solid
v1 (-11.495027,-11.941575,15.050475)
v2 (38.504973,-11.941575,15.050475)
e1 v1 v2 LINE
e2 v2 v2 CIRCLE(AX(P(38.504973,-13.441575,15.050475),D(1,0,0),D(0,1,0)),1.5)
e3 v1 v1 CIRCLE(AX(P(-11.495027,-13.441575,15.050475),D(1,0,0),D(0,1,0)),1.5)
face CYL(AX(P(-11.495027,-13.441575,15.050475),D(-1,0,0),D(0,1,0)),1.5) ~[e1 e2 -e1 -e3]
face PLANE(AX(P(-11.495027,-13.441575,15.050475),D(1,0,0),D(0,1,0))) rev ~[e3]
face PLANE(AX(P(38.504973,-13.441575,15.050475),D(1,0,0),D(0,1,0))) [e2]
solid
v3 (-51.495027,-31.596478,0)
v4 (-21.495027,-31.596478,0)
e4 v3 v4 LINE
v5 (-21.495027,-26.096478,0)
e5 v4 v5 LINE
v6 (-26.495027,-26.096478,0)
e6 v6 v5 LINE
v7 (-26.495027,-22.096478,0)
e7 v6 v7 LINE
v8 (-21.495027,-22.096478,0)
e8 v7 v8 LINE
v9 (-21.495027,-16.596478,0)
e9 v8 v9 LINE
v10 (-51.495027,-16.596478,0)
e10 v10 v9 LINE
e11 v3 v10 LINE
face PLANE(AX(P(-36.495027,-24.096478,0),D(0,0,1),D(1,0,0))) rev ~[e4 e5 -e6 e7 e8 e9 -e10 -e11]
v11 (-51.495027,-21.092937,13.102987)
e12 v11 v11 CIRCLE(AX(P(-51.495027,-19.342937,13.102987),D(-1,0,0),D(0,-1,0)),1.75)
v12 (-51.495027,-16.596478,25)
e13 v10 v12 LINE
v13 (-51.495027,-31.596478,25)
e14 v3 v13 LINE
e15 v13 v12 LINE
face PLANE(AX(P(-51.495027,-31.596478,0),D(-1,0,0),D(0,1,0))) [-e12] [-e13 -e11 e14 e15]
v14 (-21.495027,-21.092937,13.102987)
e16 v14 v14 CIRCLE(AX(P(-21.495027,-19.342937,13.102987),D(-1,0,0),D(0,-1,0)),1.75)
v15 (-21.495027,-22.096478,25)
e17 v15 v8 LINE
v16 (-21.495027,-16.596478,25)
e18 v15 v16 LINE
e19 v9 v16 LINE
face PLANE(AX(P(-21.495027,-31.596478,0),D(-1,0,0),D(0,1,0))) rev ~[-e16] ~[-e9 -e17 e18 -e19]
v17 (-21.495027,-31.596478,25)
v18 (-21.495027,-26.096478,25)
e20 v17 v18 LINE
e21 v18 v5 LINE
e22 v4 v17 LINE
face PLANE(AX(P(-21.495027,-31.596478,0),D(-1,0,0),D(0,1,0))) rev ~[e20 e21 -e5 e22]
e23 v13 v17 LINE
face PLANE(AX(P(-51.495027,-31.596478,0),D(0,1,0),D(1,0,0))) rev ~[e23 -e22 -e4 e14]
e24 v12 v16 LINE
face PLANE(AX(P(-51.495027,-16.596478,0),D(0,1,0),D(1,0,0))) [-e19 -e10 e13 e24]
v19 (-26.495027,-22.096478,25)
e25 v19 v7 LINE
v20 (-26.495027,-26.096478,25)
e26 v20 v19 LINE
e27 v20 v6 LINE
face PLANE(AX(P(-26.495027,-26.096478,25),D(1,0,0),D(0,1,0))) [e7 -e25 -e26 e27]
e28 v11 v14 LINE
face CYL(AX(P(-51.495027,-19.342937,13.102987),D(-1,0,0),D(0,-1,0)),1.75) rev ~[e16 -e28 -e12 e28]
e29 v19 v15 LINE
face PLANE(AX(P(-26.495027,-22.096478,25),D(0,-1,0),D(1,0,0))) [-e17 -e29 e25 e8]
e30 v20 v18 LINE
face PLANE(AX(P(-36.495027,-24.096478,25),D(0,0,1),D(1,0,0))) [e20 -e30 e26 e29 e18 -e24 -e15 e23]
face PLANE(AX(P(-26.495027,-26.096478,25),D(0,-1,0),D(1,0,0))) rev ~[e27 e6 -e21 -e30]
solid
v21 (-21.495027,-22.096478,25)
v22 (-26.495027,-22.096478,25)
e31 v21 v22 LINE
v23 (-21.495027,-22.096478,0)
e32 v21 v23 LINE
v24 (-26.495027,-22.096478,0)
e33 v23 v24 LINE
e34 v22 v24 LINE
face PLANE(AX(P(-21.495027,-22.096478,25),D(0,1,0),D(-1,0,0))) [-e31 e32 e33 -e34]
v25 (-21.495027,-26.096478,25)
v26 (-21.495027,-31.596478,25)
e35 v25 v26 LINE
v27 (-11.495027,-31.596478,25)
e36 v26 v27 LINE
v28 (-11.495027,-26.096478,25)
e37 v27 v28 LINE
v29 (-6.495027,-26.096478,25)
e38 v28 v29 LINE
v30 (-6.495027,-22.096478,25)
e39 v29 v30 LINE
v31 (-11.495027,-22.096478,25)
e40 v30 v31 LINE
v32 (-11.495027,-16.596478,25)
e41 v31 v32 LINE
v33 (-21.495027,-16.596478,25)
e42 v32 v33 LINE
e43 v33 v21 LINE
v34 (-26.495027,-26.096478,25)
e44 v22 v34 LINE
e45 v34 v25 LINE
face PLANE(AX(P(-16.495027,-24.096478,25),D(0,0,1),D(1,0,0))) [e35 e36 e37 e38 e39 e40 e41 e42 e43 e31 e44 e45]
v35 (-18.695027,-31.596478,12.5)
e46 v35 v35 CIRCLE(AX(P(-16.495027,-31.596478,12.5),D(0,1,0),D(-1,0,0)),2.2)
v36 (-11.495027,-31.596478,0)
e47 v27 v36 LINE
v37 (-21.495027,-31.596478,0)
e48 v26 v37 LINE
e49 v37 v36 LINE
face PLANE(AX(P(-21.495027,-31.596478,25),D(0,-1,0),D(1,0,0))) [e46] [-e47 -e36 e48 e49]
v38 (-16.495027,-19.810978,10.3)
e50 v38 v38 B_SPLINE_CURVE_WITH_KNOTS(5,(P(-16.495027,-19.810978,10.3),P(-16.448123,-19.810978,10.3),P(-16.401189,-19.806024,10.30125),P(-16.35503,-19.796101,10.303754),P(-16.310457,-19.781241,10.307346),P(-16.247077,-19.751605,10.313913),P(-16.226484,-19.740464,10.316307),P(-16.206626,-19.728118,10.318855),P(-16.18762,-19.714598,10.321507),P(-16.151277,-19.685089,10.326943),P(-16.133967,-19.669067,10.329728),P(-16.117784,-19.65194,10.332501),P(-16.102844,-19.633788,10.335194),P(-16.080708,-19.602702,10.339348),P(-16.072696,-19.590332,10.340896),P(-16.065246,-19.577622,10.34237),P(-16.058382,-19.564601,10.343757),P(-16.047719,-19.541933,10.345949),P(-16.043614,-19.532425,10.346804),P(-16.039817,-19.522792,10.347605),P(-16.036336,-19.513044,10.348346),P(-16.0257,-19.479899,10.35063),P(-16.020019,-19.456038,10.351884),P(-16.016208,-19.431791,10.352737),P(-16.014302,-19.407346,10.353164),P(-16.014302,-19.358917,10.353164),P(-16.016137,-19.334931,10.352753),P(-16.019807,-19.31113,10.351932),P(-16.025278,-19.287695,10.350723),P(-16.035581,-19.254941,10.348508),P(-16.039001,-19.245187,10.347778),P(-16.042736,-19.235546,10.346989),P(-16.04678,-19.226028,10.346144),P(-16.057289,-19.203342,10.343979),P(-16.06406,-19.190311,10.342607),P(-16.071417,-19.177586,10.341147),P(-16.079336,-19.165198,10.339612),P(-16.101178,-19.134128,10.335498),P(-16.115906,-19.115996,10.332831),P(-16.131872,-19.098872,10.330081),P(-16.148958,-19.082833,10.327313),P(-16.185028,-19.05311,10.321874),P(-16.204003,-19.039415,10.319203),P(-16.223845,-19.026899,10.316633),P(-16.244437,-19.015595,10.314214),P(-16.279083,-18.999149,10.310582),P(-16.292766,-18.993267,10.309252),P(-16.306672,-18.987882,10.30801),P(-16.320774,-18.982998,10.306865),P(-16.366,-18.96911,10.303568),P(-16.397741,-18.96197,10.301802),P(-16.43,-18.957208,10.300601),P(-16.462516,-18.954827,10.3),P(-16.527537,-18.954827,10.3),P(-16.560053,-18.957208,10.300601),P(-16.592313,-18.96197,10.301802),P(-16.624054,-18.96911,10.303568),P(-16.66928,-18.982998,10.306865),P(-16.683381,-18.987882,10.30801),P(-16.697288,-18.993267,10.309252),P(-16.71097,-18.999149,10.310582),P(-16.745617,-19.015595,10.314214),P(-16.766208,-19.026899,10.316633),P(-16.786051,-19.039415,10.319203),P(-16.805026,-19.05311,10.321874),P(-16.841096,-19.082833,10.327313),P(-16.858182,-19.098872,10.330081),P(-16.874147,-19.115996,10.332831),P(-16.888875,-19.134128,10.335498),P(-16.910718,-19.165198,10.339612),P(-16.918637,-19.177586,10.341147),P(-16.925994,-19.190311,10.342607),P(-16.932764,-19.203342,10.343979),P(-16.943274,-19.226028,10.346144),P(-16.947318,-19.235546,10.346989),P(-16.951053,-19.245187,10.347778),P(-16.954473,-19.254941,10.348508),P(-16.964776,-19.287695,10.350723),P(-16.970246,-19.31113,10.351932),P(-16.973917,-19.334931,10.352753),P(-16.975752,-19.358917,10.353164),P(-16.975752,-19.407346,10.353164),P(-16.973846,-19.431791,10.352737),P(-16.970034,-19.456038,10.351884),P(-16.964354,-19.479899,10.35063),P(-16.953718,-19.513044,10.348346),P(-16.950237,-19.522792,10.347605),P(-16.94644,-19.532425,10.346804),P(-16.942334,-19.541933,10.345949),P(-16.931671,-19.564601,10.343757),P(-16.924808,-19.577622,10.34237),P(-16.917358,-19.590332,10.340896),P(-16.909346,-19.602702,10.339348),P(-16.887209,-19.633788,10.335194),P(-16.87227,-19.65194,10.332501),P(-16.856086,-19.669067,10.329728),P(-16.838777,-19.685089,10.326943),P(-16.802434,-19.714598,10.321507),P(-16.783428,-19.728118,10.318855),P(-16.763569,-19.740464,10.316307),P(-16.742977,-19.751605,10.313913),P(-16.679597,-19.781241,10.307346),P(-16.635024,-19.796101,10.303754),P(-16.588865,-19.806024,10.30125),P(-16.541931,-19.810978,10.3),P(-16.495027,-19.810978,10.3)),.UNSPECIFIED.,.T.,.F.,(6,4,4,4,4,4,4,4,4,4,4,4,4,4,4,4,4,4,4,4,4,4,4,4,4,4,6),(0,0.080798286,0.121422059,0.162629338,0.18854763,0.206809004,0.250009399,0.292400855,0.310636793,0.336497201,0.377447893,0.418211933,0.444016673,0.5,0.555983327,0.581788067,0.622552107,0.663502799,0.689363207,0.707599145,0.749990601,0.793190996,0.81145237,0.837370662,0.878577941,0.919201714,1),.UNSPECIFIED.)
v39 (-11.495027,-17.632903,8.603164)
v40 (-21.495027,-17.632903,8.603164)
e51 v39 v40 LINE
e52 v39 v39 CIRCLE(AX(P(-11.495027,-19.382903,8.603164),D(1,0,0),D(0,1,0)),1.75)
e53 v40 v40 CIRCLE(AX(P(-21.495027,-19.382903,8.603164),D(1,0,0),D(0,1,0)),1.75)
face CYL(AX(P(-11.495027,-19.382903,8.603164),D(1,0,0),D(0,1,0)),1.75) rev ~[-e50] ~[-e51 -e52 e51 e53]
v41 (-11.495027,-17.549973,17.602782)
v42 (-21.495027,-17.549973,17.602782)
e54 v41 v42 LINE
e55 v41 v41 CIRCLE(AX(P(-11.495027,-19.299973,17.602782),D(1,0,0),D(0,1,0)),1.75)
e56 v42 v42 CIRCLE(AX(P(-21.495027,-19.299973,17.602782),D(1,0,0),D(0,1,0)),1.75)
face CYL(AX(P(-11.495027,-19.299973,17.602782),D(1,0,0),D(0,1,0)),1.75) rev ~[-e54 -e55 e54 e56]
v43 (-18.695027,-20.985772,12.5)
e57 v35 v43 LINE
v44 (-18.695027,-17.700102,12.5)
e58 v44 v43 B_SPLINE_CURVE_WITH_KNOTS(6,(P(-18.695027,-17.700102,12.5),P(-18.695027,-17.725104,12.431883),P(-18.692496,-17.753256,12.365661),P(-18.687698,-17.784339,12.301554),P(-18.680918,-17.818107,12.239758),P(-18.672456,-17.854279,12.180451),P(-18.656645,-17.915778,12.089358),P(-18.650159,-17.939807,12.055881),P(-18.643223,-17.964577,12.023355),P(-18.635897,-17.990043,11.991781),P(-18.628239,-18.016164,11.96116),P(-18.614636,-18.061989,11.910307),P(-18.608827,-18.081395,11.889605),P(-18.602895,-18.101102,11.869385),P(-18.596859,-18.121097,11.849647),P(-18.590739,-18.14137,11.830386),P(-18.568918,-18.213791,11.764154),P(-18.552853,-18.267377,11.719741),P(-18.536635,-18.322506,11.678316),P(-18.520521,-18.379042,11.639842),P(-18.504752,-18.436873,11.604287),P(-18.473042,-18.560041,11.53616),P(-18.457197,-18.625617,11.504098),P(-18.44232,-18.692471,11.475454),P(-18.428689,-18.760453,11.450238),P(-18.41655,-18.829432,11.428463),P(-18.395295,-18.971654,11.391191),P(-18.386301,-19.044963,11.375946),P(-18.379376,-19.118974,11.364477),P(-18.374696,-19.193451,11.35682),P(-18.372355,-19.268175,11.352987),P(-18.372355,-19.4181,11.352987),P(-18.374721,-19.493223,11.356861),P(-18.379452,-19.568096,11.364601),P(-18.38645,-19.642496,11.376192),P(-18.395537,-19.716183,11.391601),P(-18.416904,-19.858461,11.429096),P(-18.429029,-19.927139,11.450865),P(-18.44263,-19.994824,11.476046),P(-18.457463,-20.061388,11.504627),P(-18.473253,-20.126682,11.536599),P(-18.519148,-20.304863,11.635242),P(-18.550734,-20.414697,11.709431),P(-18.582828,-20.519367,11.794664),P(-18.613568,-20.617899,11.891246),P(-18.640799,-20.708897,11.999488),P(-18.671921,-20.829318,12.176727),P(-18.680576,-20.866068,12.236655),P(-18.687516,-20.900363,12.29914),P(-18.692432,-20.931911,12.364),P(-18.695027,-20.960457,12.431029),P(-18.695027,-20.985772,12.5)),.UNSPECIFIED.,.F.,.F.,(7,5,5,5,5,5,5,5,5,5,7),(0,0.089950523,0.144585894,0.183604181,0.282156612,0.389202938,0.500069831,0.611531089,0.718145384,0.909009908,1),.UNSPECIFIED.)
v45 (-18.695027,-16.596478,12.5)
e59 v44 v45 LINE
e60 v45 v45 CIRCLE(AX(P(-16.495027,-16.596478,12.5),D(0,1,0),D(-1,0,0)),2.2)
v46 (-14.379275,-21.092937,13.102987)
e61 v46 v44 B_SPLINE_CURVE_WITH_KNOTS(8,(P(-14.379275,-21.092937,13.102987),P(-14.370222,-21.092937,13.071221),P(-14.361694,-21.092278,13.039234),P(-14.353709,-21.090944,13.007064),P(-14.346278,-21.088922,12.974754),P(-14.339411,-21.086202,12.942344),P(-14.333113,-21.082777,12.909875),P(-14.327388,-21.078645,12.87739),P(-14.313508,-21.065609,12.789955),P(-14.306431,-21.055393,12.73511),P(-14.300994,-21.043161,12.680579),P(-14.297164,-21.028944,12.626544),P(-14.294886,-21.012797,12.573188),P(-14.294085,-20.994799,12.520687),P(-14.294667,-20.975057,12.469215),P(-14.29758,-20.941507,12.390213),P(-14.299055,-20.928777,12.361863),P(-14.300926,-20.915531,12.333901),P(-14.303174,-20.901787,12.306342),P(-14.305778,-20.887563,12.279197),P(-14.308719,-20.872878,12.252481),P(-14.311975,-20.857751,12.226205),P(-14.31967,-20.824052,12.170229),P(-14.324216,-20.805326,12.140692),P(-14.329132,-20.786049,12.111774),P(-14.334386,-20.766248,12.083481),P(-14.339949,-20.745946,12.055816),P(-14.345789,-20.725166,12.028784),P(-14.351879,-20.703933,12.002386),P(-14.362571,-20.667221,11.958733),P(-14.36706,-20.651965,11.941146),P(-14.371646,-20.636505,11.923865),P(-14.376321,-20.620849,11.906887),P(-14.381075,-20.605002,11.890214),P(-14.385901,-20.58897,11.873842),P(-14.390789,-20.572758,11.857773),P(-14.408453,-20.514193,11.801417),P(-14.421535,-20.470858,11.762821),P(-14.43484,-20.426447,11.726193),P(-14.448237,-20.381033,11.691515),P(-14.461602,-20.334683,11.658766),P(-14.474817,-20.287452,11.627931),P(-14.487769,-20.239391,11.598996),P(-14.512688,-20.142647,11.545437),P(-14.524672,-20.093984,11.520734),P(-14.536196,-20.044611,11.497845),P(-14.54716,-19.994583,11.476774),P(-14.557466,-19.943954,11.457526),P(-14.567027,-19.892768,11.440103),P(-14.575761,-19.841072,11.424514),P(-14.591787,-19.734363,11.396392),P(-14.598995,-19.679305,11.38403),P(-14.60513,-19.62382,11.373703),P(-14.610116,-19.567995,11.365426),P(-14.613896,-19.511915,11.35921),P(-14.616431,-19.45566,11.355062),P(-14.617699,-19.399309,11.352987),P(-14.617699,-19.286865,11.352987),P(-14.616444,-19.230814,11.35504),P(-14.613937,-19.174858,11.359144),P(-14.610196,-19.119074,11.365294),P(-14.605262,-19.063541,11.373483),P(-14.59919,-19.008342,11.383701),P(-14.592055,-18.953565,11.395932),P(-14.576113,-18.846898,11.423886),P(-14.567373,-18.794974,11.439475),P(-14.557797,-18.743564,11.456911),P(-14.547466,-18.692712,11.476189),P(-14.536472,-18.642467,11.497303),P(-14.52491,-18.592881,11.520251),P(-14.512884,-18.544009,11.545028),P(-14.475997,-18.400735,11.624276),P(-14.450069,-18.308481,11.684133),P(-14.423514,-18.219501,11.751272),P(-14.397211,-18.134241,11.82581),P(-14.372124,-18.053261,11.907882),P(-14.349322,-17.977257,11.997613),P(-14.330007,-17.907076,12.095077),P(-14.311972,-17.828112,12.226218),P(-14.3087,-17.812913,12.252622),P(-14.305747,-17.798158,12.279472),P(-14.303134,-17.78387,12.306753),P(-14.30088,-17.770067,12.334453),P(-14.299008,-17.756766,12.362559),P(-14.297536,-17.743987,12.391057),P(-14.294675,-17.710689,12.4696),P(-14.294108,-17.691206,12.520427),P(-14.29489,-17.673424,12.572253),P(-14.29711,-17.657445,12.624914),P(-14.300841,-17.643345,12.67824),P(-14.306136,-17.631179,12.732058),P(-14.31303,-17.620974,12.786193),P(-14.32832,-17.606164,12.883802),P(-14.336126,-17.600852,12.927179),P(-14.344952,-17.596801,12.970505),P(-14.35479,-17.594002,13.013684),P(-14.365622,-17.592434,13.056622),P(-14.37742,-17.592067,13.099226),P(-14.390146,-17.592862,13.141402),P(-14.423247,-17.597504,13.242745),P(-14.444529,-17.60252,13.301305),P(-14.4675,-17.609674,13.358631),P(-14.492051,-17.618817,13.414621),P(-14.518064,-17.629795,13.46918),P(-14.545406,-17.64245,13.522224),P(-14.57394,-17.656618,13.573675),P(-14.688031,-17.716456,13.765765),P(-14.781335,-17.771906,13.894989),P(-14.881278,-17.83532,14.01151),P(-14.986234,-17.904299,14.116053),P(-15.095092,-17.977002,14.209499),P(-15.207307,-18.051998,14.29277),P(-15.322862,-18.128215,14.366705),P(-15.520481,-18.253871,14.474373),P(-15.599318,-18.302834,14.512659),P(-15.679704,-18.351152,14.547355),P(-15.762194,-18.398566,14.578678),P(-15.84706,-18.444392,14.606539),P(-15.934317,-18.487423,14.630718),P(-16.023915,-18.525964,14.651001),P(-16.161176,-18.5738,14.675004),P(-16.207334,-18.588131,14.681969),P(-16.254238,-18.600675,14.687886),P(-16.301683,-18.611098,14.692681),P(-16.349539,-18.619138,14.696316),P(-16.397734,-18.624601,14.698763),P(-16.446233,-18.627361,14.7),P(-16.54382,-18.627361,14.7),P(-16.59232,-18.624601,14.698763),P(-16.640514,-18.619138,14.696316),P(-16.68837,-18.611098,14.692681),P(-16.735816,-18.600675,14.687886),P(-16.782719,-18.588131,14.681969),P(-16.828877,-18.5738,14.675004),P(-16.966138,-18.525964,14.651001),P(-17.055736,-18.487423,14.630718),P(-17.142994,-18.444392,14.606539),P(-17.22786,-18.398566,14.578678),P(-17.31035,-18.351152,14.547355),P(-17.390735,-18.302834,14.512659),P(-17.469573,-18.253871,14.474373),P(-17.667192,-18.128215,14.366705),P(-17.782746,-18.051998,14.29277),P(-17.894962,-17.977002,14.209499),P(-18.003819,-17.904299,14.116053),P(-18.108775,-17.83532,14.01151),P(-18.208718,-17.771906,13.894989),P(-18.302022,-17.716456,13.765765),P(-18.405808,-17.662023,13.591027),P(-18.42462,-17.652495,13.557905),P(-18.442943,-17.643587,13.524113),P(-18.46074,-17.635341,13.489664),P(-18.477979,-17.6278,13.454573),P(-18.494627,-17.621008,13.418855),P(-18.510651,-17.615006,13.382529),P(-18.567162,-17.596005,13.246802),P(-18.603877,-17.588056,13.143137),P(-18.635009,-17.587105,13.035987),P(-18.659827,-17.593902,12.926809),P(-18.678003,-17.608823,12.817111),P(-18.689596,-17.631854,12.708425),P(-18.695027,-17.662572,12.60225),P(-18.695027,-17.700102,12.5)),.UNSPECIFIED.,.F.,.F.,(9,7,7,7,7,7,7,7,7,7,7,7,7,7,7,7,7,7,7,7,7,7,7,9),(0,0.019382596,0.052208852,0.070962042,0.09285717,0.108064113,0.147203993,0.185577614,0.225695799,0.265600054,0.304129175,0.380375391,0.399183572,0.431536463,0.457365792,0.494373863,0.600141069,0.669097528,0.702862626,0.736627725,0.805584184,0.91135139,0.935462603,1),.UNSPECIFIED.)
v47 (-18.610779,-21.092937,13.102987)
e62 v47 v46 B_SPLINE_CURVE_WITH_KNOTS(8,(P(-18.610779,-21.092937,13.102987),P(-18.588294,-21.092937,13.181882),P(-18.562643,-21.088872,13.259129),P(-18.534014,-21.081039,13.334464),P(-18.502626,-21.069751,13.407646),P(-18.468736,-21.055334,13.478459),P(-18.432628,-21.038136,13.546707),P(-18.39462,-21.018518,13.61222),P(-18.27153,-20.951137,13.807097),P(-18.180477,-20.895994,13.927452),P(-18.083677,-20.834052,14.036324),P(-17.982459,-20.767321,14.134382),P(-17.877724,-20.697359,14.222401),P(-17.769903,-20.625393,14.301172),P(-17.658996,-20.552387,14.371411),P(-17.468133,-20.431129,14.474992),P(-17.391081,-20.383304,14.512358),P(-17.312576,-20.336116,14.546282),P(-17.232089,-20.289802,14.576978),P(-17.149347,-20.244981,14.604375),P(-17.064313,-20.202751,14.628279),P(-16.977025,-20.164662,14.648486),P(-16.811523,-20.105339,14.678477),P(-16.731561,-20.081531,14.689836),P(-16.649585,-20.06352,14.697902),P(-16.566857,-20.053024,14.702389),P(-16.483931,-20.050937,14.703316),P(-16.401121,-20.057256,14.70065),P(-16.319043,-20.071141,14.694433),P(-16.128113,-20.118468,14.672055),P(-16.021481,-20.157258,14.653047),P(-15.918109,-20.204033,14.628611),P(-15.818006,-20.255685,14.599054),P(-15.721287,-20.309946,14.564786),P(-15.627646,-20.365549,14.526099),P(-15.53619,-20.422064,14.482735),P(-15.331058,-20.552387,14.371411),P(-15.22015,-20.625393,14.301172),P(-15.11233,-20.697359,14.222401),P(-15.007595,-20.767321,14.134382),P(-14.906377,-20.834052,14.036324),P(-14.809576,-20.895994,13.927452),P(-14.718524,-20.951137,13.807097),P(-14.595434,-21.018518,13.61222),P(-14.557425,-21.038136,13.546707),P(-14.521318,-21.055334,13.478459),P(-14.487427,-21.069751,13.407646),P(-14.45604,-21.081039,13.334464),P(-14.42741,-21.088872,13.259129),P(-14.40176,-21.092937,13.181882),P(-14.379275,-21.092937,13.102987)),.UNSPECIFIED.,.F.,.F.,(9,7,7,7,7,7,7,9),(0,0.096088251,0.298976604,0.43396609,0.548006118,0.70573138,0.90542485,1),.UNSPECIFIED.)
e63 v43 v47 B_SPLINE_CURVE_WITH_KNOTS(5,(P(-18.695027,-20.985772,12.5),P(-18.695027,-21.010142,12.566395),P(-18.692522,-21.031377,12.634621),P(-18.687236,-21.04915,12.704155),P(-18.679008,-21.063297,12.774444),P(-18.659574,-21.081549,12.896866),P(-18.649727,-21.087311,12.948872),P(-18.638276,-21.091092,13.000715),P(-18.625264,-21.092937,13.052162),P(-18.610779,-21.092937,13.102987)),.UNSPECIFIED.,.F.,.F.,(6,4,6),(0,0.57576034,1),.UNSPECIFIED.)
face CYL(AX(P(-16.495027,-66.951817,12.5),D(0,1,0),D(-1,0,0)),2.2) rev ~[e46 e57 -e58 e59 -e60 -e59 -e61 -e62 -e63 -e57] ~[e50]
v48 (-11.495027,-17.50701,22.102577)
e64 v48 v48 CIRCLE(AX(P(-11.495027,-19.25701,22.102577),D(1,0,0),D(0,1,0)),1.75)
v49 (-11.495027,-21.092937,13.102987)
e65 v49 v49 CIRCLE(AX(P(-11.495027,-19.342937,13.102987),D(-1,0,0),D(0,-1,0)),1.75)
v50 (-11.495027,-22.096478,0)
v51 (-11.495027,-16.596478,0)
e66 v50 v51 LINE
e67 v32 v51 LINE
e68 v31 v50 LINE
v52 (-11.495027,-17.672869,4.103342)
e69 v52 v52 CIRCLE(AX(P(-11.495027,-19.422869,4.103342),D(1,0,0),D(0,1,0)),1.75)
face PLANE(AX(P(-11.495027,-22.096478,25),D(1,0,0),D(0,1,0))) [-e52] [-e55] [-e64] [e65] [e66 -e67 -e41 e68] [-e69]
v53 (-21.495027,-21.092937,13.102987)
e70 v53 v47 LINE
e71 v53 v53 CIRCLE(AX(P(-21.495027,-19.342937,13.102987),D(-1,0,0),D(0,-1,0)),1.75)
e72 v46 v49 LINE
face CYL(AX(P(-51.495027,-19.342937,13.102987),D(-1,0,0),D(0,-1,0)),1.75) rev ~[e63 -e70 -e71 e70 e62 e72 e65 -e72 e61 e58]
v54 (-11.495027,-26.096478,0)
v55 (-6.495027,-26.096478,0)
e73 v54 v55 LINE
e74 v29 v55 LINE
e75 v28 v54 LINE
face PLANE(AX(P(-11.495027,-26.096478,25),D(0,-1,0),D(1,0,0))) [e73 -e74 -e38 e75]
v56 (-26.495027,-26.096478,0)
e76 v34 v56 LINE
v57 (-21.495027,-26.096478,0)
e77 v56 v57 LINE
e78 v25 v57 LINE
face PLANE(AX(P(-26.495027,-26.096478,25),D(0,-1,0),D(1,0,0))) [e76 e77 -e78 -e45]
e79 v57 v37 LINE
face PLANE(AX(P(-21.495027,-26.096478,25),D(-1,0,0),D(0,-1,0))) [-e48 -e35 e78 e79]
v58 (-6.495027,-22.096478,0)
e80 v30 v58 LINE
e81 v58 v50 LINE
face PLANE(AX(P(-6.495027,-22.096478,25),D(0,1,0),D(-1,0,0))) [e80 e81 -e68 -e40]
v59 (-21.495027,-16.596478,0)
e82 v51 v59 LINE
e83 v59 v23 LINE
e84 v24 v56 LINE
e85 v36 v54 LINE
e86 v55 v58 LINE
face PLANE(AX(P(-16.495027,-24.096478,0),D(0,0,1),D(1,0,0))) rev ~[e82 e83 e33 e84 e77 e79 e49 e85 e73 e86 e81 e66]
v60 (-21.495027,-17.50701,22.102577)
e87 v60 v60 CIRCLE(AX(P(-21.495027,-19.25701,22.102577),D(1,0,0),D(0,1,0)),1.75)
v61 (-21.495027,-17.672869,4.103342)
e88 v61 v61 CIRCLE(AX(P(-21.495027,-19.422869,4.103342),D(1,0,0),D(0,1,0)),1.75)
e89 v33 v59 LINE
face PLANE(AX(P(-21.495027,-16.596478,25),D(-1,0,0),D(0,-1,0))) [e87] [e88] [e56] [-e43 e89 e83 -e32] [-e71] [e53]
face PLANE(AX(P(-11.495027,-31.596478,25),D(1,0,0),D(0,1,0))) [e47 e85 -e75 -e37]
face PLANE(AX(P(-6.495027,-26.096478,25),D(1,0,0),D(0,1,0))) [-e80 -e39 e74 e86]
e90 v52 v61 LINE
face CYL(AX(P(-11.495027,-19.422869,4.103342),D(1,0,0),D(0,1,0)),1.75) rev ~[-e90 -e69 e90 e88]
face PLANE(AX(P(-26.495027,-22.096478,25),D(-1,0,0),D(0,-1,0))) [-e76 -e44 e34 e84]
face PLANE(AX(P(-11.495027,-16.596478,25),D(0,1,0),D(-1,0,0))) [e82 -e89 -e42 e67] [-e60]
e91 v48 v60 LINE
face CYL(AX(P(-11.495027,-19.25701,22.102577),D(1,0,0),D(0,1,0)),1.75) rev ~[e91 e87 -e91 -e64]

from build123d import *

# Parameters (mm, degrees)
F0_W      = 30
F0_H      = 15
F1_DEPTH  = 25
F2_W      = 5
F2_H      = 4
F3_DEPTH  = 25.001
F5_DEPTH  = 25
F6_R      = 1.75
F7_DEPTH  = 45.001
F8_R      = 1.75
F9_DEPTH  = 40.001
F10_R     = 1.5
F11_DEPTH = 50
F13_D     = 4.4


# Not quite as in the source:
# - a feature names something its author has since deleted; it is built from what else it names


with BuildPart() as f1:
    # F0 (on Top) → F1 (new body)
    with BuildSketch(Plane.XY):
        with Locations((-36.4950267971, -24.0964780748)):
            Rectangle(F0_W, F0_H)
    extrude(amount=F1_DEPTH)

    # F2 (on face) → F3 (cut, through all)
    with BuildSketch(Plane.XY.offset(25)):
        with Locations((-23.9950267971, -24.0964780748)):
            Rectangle(F2_W, F2_H)
    extrude(amount=-F3_DEPTH, mode=Mode.SUBTRACT)


with BuildPart() as f5:
    # F4 (on face) → F5 (new body)
    with BuildSketch(Plane.XY.offset(25)):
        Polygon((-11.4950267971, -16.5964780748), (-21.4950267971, -16.5964780748), (-21.4950267971, -22.0964780748), (-26.4950267971, -22.0964780748), (-26.4950267971, -26.0964780748), (-21.4950267971, -26.0964780748), (-21.4950267971, -31.5964780748), (-11.4950267971, -31.5964780748), (-11.4950267971, -26.0964780748), (-6.4950267971, -26.0964780748), (-6.4950267971, -22.0964780748), (-11.4950267971, -22.0964780748), align=None)
    extrude(amount=-F5_DEPTH)


with BuildPart() as f7_tool:
    # F6 (on face) → F7 (new body, through all)
    with BuildSketch(Plane(origin=(-51.4950267971, 0, 0), x_dir=(0, -1, 0), z_dir=(-1, 0, 0))):
        with Locations((19.3429368734, 13.1029868498)):
            Circle(F6_R)
    extrude(amount=-F7_DEPTH)


with BuildPart() as f1_1:
    add(f1.part)

    # F7: cut by f7_tool
    add(f7_tool.part, mode=Mode.SUBTRACT)


with BuildPart() as f5_1:
    add(f5.part)

    # F7: cut by f7_tool
    add(f7_tool.part, mode=Mode.SUBTRACT)

    # F8 (on face) → F9 (cut, through all)
    with BuildSketch(Plane.YZ.offset(-11.4950267971)):
        with Locations((-19.257010007, 22.1025766501)):
            Circle(F8_R)
        with Locations((-19.2999734402, 17.60278175)):
            Circle(F8_R)
        with Locations((-19.3829028493, 8.6031643288)):
            Circle(F8_R)
        with Locations((-19.4228688251, 4.1033418078)):
            Circle(F8_R)
    extrude(amount=-F9_DEPTH, mode=Mode.SUBTRACT)

    # F13 (through all)
    with Locations(Plane.XZ.offset(31.5964780748)):
        with Locations((-16.4950267971, 12.5)):
            Hole(F13_D / 2)


with BuildPart() as f11:
    # F10 (on face) → F11 (new body)
    with BuildSketch(Plane.YZ.offset(-11.4950267971)):
        with Locations((-13.4415747598, 15.0504745543)):
            Circle(F10_R)
    extrude(amount=F11_DEPTH)


solid = Compound([f1_1.part, f5_1.part, f11.part])
